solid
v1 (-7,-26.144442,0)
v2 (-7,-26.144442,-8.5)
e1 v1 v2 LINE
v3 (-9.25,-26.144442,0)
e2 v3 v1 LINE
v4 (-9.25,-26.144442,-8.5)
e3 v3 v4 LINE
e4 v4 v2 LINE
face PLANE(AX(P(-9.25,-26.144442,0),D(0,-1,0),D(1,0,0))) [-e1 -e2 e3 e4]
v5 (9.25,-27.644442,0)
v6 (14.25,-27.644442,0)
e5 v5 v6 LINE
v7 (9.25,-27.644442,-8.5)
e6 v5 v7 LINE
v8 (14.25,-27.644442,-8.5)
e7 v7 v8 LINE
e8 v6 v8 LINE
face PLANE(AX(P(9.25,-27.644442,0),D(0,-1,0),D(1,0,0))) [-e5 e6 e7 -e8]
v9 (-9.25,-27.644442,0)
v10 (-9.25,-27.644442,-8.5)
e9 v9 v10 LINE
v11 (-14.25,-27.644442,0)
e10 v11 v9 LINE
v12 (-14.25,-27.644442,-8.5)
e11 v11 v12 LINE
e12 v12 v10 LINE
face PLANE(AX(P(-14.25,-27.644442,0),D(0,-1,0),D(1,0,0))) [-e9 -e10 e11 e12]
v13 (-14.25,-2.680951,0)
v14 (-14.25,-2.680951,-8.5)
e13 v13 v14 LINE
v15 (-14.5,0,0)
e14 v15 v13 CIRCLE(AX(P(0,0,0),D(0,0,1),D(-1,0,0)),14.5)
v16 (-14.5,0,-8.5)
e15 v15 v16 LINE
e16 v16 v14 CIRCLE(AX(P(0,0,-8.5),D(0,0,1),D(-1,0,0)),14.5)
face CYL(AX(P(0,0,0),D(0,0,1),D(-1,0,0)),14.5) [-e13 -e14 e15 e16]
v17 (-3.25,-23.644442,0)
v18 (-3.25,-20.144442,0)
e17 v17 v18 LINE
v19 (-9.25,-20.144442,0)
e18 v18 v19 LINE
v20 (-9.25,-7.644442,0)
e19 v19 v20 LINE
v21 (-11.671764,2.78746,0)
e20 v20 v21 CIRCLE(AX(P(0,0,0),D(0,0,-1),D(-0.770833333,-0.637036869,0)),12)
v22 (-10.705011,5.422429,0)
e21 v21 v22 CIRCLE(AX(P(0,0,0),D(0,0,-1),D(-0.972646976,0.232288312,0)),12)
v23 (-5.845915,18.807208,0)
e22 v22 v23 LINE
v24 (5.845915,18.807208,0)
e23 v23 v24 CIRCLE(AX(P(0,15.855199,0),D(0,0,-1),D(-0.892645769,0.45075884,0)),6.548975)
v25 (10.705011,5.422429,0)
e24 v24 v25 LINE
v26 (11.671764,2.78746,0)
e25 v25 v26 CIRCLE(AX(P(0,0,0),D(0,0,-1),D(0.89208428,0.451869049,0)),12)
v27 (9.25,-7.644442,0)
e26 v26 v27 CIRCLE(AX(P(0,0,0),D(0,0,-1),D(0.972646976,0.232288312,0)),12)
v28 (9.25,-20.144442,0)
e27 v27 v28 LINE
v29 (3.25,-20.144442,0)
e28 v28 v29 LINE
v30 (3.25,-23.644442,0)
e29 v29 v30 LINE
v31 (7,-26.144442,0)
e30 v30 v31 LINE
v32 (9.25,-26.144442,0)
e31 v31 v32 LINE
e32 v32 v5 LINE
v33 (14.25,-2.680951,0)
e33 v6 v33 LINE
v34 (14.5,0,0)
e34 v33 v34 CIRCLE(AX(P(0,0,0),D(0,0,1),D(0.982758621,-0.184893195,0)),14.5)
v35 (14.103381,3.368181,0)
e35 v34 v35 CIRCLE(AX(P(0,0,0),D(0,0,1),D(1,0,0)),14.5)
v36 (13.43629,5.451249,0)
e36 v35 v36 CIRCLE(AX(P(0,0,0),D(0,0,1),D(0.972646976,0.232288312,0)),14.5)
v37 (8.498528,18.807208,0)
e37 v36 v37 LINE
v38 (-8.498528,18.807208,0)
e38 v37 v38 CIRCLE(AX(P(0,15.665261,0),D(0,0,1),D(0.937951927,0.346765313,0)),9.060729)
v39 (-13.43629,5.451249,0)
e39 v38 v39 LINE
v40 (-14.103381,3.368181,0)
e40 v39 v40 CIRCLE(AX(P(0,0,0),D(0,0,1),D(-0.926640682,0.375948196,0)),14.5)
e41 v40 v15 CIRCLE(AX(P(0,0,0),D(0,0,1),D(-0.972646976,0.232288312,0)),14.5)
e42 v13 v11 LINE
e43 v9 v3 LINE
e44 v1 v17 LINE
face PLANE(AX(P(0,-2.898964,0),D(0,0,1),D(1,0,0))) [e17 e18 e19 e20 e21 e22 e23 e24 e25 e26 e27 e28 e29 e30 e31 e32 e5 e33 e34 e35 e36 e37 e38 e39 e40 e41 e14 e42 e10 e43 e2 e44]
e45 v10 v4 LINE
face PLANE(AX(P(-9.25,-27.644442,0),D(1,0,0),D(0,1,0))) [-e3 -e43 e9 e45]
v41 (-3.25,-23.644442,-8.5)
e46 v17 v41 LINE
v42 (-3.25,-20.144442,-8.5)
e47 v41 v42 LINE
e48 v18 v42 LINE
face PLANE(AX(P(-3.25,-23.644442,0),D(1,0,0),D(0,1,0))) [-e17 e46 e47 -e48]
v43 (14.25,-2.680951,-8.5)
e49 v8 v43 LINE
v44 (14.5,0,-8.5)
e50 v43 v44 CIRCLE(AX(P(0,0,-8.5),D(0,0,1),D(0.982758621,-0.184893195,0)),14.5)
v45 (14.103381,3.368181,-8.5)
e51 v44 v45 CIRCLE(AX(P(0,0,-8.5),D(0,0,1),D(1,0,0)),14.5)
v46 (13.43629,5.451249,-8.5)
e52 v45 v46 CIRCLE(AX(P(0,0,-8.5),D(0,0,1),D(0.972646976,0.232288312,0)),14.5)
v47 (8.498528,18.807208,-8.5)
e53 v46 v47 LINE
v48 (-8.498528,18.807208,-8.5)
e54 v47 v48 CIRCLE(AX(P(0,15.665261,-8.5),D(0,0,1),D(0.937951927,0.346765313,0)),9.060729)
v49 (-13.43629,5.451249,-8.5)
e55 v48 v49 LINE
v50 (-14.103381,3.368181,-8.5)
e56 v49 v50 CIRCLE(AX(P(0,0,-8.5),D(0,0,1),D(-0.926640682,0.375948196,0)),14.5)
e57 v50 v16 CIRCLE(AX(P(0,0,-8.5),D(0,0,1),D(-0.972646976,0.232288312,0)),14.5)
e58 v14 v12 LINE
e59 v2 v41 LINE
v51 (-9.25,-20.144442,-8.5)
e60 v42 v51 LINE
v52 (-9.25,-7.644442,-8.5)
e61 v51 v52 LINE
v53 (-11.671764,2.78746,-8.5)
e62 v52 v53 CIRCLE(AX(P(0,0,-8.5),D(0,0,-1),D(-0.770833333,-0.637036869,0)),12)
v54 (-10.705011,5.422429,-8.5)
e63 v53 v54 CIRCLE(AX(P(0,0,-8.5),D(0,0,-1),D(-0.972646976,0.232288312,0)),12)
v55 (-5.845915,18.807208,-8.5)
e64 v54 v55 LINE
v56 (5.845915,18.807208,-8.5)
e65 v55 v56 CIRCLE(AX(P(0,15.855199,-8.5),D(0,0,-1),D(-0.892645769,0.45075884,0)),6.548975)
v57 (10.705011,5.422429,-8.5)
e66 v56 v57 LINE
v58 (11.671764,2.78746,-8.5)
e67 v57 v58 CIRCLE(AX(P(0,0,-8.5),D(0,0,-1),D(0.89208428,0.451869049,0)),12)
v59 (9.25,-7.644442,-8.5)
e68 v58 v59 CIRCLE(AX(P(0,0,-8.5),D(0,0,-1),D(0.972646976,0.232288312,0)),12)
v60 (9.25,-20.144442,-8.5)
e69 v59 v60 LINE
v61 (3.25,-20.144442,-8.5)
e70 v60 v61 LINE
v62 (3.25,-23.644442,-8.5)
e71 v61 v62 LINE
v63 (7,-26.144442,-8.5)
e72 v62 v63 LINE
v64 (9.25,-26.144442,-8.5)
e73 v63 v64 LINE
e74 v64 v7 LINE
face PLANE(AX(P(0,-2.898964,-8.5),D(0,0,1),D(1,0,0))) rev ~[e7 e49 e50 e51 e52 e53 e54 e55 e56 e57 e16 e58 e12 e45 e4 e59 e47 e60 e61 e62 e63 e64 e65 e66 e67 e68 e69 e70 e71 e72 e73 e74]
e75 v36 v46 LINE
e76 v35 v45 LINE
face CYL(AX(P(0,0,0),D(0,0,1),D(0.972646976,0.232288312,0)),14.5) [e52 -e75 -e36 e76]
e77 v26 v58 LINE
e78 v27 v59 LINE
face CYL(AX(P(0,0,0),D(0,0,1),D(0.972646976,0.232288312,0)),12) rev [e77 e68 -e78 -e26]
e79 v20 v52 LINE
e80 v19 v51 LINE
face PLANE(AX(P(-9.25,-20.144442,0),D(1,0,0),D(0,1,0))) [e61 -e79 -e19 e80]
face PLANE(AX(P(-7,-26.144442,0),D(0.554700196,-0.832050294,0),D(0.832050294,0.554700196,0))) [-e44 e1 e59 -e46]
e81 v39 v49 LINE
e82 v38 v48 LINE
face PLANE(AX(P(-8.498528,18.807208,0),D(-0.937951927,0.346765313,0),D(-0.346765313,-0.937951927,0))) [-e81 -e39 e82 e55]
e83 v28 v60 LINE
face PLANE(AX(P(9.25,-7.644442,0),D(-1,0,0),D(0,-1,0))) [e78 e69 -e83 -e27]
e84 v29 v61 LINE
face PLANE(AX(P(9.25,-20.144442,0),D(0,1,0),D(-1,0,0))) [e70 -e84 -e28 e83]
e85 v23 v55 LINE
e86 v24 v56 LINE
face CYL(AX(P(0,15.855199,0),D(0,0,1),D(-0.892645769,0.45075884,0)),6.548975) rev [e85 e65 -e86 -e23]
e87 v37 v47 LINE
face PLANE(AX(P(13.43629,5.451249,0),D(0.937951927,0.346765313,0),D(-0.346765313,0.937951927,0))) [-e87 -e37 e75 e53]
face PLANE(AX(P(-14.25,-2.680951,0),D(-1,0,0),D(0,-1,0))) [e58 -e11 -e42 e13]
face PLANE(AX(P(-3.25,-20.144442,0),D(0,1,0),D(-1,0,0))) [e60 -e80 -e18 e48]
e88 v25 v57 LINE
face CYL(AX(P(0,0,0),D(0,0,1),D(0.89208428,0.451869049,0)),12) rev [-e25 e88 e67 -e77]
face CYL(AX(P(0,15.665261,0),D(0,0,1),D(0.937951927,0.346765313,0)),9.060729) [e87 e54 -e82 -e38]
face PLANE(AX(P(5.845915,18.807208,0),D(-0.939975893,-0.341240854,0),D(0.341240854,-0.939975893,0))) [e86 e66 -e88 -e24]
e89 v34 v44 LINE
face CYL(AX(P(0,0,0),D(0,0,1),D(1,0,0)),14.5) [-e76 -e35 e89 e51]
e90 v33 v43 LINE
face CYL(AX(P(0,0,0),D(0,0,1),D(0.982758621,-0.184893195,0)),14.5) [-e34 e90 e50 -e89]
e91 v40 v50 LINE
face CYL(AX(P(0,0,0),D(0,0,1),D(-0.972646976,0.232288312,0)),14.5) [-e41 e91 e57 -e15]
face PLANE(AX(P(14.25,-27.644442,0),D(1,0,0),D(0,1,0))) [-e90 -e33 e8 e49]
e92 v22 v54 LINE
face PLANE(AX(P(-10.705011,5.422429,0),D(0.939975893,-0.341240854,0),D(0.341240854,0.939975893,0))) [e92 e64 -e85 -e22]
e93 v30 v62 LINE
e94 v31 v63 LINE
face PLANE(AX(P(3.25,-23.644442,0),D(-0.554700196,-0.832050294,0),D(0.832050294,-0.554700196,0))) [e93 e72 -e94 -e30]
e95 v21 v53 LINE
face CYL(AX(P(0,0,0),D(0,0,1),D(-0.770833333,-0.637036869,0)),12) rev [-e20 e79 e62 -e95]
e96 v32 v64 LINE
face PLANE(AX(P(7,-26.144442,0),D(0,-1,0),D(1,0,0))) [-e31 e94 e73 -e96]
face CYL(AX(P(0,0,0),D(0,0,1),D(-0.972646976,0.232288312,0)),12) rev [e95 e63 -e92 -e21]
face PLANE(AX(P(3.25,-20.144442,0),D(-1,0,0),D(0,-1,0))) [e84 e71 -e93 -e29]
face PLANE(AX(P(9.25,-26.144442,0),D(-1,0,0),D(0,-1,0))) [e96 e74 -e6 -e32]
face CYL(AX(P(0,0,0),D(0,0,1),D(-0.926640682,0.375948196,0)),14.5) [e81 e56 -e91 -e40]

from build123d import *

# Parameters (mm, degrees)
F1_DEPTH = 8.5


# Not quite as in the source:
# - a feature names something its author has since deleted; it is built from what else it names


with BuildPart() as f1:
    # F0 (on Top) → F1 (new body)
    with BuildSketch(Plane.XY):
        with BuildLine():
            ThreePointArc((-9.25, -7.6444424257), (-11.6891485981, -2.7136331829), (-11.6717637121, 2.7874597484))
            ThreePointArc((-11.6717637121, 2.7874597484), (-11.2656904289, 4.1333060811), (-10.7050113586, 5.42242859))
            Line((-10.7050113586, 5.42242859), (-5.8459149373, 18.8072078091))
            ThreePointArc((-5.8459149373, 18.8072078091), (0, 22.4041745059), (5.8459149373, 18.8072078091))
            Line((5.8459149373, 18.8072078091), (10.7050113586, 5.42242859))
            ThreePointArc((10.7050113586, 5.42242859), (11.2656904289, 4.1333060811), (11.6717637121, 2.7874597484))
            ThreePointArc((11.6717637121, 2.7874597484), (11.6891485981, -2.7136331829), (9.25, -7.6444424257))
            Line((9.25, -7.6444424257), (9.25, -11.1663557171))
            Line((9.25, -11.1663557171), (9.25, -20.1444424257))
            Line((9.25, -20.1444424257), (3.25, -20.1444424257))
            Line((3.25, -20.1444424257), (3.25, -21.1444424257))
            Line((3.25, -21.1444424257), (3.25, -23.6444424257))
            Line((3.25, -23.6444424257), (7, -26.1444424257))
            Line((7, -26.1444424257), (9.25, -26.1444424257))
            Line((9.25, -26.1444424257), (9.25, -27.6444424257))
            Line((9.25, -27.6444424257), (14.25, -27.6444424257))
            Line((14.25, -27.6444424257), (14.25, -21.4303609628))
            Line((14.25, -21.4303609628), (14.25, -2.6809513237))
            ThreePointArc((14.25, -2.6809513237), (14.437364718, -1.3462912018), (14.5, 0))
            ThreePointArc((14.5, 0), (14.400503927, 1.6957259941), (14.1033811521, 3.3681805293))
            ThreePointArc((14.1033811521, 3.3681805293), (13.8091695526, 4.4223111907), (13.4362898945, 5.4512488358))
            Line((13.4362898945, 5.4512488358), (8.4985279846, 18.8072078091))
            ThreePointArc((8.4985279846, 18.8072078091), (0, 24.7259901099), (-8.4985279846, 18.8072078091))
            Line((-8.4985279846, 18.8072078091), (-13.4362898945, 5.4512488358))
            ThreePointArc((-13.4362898945, 5.4512488358), (-13.8091695526, 4.4223111907), (-14.1033811521, 3.3681805293))
            ThreePointArc((-14.1033811521, 3.3681805293), (-14.400503927, 1.6957259941), (-14.5, 0))
            ThreePointArc((-14.5, 0), (-14.437364718, -1.3462912018), (-14.25, -2.6809513237))
            Line((-14.25, -2.6809513237), (-14.25, -21.1444424257))
            Line((-14.25, -21.1444424257), (-14.25, -27.6444424257))
            Line((-14.25, -27.6444424257), (-9.25, -27.6444424257))
            Line((-9.25, -27.6444424257), (-9.25, -26.1444424257))
            Line((-9.25, -26.1444424257), (-7, -26.1444424257))
            Line((-7, -26.1444424257), (-3.25, -23.6444424257))
            Line((-3.25, -23.6444424257), (-3.25, -21.1444424257))
            Line((-3.25, -21.1444424257), (-3.25, -20.1444424257))
            Line((-3.25, -20.1444424257), (-9.25, -20.1444424257))
            Line((-9.25, -20.1444424257), (-9.25, -11.1663557171))
            Line((-9.25, -11.1663557171), (-9.25, -7.6444424257))
        make_face()
    extrude(amount=-F1_DEPTH)


solid = f1.part
